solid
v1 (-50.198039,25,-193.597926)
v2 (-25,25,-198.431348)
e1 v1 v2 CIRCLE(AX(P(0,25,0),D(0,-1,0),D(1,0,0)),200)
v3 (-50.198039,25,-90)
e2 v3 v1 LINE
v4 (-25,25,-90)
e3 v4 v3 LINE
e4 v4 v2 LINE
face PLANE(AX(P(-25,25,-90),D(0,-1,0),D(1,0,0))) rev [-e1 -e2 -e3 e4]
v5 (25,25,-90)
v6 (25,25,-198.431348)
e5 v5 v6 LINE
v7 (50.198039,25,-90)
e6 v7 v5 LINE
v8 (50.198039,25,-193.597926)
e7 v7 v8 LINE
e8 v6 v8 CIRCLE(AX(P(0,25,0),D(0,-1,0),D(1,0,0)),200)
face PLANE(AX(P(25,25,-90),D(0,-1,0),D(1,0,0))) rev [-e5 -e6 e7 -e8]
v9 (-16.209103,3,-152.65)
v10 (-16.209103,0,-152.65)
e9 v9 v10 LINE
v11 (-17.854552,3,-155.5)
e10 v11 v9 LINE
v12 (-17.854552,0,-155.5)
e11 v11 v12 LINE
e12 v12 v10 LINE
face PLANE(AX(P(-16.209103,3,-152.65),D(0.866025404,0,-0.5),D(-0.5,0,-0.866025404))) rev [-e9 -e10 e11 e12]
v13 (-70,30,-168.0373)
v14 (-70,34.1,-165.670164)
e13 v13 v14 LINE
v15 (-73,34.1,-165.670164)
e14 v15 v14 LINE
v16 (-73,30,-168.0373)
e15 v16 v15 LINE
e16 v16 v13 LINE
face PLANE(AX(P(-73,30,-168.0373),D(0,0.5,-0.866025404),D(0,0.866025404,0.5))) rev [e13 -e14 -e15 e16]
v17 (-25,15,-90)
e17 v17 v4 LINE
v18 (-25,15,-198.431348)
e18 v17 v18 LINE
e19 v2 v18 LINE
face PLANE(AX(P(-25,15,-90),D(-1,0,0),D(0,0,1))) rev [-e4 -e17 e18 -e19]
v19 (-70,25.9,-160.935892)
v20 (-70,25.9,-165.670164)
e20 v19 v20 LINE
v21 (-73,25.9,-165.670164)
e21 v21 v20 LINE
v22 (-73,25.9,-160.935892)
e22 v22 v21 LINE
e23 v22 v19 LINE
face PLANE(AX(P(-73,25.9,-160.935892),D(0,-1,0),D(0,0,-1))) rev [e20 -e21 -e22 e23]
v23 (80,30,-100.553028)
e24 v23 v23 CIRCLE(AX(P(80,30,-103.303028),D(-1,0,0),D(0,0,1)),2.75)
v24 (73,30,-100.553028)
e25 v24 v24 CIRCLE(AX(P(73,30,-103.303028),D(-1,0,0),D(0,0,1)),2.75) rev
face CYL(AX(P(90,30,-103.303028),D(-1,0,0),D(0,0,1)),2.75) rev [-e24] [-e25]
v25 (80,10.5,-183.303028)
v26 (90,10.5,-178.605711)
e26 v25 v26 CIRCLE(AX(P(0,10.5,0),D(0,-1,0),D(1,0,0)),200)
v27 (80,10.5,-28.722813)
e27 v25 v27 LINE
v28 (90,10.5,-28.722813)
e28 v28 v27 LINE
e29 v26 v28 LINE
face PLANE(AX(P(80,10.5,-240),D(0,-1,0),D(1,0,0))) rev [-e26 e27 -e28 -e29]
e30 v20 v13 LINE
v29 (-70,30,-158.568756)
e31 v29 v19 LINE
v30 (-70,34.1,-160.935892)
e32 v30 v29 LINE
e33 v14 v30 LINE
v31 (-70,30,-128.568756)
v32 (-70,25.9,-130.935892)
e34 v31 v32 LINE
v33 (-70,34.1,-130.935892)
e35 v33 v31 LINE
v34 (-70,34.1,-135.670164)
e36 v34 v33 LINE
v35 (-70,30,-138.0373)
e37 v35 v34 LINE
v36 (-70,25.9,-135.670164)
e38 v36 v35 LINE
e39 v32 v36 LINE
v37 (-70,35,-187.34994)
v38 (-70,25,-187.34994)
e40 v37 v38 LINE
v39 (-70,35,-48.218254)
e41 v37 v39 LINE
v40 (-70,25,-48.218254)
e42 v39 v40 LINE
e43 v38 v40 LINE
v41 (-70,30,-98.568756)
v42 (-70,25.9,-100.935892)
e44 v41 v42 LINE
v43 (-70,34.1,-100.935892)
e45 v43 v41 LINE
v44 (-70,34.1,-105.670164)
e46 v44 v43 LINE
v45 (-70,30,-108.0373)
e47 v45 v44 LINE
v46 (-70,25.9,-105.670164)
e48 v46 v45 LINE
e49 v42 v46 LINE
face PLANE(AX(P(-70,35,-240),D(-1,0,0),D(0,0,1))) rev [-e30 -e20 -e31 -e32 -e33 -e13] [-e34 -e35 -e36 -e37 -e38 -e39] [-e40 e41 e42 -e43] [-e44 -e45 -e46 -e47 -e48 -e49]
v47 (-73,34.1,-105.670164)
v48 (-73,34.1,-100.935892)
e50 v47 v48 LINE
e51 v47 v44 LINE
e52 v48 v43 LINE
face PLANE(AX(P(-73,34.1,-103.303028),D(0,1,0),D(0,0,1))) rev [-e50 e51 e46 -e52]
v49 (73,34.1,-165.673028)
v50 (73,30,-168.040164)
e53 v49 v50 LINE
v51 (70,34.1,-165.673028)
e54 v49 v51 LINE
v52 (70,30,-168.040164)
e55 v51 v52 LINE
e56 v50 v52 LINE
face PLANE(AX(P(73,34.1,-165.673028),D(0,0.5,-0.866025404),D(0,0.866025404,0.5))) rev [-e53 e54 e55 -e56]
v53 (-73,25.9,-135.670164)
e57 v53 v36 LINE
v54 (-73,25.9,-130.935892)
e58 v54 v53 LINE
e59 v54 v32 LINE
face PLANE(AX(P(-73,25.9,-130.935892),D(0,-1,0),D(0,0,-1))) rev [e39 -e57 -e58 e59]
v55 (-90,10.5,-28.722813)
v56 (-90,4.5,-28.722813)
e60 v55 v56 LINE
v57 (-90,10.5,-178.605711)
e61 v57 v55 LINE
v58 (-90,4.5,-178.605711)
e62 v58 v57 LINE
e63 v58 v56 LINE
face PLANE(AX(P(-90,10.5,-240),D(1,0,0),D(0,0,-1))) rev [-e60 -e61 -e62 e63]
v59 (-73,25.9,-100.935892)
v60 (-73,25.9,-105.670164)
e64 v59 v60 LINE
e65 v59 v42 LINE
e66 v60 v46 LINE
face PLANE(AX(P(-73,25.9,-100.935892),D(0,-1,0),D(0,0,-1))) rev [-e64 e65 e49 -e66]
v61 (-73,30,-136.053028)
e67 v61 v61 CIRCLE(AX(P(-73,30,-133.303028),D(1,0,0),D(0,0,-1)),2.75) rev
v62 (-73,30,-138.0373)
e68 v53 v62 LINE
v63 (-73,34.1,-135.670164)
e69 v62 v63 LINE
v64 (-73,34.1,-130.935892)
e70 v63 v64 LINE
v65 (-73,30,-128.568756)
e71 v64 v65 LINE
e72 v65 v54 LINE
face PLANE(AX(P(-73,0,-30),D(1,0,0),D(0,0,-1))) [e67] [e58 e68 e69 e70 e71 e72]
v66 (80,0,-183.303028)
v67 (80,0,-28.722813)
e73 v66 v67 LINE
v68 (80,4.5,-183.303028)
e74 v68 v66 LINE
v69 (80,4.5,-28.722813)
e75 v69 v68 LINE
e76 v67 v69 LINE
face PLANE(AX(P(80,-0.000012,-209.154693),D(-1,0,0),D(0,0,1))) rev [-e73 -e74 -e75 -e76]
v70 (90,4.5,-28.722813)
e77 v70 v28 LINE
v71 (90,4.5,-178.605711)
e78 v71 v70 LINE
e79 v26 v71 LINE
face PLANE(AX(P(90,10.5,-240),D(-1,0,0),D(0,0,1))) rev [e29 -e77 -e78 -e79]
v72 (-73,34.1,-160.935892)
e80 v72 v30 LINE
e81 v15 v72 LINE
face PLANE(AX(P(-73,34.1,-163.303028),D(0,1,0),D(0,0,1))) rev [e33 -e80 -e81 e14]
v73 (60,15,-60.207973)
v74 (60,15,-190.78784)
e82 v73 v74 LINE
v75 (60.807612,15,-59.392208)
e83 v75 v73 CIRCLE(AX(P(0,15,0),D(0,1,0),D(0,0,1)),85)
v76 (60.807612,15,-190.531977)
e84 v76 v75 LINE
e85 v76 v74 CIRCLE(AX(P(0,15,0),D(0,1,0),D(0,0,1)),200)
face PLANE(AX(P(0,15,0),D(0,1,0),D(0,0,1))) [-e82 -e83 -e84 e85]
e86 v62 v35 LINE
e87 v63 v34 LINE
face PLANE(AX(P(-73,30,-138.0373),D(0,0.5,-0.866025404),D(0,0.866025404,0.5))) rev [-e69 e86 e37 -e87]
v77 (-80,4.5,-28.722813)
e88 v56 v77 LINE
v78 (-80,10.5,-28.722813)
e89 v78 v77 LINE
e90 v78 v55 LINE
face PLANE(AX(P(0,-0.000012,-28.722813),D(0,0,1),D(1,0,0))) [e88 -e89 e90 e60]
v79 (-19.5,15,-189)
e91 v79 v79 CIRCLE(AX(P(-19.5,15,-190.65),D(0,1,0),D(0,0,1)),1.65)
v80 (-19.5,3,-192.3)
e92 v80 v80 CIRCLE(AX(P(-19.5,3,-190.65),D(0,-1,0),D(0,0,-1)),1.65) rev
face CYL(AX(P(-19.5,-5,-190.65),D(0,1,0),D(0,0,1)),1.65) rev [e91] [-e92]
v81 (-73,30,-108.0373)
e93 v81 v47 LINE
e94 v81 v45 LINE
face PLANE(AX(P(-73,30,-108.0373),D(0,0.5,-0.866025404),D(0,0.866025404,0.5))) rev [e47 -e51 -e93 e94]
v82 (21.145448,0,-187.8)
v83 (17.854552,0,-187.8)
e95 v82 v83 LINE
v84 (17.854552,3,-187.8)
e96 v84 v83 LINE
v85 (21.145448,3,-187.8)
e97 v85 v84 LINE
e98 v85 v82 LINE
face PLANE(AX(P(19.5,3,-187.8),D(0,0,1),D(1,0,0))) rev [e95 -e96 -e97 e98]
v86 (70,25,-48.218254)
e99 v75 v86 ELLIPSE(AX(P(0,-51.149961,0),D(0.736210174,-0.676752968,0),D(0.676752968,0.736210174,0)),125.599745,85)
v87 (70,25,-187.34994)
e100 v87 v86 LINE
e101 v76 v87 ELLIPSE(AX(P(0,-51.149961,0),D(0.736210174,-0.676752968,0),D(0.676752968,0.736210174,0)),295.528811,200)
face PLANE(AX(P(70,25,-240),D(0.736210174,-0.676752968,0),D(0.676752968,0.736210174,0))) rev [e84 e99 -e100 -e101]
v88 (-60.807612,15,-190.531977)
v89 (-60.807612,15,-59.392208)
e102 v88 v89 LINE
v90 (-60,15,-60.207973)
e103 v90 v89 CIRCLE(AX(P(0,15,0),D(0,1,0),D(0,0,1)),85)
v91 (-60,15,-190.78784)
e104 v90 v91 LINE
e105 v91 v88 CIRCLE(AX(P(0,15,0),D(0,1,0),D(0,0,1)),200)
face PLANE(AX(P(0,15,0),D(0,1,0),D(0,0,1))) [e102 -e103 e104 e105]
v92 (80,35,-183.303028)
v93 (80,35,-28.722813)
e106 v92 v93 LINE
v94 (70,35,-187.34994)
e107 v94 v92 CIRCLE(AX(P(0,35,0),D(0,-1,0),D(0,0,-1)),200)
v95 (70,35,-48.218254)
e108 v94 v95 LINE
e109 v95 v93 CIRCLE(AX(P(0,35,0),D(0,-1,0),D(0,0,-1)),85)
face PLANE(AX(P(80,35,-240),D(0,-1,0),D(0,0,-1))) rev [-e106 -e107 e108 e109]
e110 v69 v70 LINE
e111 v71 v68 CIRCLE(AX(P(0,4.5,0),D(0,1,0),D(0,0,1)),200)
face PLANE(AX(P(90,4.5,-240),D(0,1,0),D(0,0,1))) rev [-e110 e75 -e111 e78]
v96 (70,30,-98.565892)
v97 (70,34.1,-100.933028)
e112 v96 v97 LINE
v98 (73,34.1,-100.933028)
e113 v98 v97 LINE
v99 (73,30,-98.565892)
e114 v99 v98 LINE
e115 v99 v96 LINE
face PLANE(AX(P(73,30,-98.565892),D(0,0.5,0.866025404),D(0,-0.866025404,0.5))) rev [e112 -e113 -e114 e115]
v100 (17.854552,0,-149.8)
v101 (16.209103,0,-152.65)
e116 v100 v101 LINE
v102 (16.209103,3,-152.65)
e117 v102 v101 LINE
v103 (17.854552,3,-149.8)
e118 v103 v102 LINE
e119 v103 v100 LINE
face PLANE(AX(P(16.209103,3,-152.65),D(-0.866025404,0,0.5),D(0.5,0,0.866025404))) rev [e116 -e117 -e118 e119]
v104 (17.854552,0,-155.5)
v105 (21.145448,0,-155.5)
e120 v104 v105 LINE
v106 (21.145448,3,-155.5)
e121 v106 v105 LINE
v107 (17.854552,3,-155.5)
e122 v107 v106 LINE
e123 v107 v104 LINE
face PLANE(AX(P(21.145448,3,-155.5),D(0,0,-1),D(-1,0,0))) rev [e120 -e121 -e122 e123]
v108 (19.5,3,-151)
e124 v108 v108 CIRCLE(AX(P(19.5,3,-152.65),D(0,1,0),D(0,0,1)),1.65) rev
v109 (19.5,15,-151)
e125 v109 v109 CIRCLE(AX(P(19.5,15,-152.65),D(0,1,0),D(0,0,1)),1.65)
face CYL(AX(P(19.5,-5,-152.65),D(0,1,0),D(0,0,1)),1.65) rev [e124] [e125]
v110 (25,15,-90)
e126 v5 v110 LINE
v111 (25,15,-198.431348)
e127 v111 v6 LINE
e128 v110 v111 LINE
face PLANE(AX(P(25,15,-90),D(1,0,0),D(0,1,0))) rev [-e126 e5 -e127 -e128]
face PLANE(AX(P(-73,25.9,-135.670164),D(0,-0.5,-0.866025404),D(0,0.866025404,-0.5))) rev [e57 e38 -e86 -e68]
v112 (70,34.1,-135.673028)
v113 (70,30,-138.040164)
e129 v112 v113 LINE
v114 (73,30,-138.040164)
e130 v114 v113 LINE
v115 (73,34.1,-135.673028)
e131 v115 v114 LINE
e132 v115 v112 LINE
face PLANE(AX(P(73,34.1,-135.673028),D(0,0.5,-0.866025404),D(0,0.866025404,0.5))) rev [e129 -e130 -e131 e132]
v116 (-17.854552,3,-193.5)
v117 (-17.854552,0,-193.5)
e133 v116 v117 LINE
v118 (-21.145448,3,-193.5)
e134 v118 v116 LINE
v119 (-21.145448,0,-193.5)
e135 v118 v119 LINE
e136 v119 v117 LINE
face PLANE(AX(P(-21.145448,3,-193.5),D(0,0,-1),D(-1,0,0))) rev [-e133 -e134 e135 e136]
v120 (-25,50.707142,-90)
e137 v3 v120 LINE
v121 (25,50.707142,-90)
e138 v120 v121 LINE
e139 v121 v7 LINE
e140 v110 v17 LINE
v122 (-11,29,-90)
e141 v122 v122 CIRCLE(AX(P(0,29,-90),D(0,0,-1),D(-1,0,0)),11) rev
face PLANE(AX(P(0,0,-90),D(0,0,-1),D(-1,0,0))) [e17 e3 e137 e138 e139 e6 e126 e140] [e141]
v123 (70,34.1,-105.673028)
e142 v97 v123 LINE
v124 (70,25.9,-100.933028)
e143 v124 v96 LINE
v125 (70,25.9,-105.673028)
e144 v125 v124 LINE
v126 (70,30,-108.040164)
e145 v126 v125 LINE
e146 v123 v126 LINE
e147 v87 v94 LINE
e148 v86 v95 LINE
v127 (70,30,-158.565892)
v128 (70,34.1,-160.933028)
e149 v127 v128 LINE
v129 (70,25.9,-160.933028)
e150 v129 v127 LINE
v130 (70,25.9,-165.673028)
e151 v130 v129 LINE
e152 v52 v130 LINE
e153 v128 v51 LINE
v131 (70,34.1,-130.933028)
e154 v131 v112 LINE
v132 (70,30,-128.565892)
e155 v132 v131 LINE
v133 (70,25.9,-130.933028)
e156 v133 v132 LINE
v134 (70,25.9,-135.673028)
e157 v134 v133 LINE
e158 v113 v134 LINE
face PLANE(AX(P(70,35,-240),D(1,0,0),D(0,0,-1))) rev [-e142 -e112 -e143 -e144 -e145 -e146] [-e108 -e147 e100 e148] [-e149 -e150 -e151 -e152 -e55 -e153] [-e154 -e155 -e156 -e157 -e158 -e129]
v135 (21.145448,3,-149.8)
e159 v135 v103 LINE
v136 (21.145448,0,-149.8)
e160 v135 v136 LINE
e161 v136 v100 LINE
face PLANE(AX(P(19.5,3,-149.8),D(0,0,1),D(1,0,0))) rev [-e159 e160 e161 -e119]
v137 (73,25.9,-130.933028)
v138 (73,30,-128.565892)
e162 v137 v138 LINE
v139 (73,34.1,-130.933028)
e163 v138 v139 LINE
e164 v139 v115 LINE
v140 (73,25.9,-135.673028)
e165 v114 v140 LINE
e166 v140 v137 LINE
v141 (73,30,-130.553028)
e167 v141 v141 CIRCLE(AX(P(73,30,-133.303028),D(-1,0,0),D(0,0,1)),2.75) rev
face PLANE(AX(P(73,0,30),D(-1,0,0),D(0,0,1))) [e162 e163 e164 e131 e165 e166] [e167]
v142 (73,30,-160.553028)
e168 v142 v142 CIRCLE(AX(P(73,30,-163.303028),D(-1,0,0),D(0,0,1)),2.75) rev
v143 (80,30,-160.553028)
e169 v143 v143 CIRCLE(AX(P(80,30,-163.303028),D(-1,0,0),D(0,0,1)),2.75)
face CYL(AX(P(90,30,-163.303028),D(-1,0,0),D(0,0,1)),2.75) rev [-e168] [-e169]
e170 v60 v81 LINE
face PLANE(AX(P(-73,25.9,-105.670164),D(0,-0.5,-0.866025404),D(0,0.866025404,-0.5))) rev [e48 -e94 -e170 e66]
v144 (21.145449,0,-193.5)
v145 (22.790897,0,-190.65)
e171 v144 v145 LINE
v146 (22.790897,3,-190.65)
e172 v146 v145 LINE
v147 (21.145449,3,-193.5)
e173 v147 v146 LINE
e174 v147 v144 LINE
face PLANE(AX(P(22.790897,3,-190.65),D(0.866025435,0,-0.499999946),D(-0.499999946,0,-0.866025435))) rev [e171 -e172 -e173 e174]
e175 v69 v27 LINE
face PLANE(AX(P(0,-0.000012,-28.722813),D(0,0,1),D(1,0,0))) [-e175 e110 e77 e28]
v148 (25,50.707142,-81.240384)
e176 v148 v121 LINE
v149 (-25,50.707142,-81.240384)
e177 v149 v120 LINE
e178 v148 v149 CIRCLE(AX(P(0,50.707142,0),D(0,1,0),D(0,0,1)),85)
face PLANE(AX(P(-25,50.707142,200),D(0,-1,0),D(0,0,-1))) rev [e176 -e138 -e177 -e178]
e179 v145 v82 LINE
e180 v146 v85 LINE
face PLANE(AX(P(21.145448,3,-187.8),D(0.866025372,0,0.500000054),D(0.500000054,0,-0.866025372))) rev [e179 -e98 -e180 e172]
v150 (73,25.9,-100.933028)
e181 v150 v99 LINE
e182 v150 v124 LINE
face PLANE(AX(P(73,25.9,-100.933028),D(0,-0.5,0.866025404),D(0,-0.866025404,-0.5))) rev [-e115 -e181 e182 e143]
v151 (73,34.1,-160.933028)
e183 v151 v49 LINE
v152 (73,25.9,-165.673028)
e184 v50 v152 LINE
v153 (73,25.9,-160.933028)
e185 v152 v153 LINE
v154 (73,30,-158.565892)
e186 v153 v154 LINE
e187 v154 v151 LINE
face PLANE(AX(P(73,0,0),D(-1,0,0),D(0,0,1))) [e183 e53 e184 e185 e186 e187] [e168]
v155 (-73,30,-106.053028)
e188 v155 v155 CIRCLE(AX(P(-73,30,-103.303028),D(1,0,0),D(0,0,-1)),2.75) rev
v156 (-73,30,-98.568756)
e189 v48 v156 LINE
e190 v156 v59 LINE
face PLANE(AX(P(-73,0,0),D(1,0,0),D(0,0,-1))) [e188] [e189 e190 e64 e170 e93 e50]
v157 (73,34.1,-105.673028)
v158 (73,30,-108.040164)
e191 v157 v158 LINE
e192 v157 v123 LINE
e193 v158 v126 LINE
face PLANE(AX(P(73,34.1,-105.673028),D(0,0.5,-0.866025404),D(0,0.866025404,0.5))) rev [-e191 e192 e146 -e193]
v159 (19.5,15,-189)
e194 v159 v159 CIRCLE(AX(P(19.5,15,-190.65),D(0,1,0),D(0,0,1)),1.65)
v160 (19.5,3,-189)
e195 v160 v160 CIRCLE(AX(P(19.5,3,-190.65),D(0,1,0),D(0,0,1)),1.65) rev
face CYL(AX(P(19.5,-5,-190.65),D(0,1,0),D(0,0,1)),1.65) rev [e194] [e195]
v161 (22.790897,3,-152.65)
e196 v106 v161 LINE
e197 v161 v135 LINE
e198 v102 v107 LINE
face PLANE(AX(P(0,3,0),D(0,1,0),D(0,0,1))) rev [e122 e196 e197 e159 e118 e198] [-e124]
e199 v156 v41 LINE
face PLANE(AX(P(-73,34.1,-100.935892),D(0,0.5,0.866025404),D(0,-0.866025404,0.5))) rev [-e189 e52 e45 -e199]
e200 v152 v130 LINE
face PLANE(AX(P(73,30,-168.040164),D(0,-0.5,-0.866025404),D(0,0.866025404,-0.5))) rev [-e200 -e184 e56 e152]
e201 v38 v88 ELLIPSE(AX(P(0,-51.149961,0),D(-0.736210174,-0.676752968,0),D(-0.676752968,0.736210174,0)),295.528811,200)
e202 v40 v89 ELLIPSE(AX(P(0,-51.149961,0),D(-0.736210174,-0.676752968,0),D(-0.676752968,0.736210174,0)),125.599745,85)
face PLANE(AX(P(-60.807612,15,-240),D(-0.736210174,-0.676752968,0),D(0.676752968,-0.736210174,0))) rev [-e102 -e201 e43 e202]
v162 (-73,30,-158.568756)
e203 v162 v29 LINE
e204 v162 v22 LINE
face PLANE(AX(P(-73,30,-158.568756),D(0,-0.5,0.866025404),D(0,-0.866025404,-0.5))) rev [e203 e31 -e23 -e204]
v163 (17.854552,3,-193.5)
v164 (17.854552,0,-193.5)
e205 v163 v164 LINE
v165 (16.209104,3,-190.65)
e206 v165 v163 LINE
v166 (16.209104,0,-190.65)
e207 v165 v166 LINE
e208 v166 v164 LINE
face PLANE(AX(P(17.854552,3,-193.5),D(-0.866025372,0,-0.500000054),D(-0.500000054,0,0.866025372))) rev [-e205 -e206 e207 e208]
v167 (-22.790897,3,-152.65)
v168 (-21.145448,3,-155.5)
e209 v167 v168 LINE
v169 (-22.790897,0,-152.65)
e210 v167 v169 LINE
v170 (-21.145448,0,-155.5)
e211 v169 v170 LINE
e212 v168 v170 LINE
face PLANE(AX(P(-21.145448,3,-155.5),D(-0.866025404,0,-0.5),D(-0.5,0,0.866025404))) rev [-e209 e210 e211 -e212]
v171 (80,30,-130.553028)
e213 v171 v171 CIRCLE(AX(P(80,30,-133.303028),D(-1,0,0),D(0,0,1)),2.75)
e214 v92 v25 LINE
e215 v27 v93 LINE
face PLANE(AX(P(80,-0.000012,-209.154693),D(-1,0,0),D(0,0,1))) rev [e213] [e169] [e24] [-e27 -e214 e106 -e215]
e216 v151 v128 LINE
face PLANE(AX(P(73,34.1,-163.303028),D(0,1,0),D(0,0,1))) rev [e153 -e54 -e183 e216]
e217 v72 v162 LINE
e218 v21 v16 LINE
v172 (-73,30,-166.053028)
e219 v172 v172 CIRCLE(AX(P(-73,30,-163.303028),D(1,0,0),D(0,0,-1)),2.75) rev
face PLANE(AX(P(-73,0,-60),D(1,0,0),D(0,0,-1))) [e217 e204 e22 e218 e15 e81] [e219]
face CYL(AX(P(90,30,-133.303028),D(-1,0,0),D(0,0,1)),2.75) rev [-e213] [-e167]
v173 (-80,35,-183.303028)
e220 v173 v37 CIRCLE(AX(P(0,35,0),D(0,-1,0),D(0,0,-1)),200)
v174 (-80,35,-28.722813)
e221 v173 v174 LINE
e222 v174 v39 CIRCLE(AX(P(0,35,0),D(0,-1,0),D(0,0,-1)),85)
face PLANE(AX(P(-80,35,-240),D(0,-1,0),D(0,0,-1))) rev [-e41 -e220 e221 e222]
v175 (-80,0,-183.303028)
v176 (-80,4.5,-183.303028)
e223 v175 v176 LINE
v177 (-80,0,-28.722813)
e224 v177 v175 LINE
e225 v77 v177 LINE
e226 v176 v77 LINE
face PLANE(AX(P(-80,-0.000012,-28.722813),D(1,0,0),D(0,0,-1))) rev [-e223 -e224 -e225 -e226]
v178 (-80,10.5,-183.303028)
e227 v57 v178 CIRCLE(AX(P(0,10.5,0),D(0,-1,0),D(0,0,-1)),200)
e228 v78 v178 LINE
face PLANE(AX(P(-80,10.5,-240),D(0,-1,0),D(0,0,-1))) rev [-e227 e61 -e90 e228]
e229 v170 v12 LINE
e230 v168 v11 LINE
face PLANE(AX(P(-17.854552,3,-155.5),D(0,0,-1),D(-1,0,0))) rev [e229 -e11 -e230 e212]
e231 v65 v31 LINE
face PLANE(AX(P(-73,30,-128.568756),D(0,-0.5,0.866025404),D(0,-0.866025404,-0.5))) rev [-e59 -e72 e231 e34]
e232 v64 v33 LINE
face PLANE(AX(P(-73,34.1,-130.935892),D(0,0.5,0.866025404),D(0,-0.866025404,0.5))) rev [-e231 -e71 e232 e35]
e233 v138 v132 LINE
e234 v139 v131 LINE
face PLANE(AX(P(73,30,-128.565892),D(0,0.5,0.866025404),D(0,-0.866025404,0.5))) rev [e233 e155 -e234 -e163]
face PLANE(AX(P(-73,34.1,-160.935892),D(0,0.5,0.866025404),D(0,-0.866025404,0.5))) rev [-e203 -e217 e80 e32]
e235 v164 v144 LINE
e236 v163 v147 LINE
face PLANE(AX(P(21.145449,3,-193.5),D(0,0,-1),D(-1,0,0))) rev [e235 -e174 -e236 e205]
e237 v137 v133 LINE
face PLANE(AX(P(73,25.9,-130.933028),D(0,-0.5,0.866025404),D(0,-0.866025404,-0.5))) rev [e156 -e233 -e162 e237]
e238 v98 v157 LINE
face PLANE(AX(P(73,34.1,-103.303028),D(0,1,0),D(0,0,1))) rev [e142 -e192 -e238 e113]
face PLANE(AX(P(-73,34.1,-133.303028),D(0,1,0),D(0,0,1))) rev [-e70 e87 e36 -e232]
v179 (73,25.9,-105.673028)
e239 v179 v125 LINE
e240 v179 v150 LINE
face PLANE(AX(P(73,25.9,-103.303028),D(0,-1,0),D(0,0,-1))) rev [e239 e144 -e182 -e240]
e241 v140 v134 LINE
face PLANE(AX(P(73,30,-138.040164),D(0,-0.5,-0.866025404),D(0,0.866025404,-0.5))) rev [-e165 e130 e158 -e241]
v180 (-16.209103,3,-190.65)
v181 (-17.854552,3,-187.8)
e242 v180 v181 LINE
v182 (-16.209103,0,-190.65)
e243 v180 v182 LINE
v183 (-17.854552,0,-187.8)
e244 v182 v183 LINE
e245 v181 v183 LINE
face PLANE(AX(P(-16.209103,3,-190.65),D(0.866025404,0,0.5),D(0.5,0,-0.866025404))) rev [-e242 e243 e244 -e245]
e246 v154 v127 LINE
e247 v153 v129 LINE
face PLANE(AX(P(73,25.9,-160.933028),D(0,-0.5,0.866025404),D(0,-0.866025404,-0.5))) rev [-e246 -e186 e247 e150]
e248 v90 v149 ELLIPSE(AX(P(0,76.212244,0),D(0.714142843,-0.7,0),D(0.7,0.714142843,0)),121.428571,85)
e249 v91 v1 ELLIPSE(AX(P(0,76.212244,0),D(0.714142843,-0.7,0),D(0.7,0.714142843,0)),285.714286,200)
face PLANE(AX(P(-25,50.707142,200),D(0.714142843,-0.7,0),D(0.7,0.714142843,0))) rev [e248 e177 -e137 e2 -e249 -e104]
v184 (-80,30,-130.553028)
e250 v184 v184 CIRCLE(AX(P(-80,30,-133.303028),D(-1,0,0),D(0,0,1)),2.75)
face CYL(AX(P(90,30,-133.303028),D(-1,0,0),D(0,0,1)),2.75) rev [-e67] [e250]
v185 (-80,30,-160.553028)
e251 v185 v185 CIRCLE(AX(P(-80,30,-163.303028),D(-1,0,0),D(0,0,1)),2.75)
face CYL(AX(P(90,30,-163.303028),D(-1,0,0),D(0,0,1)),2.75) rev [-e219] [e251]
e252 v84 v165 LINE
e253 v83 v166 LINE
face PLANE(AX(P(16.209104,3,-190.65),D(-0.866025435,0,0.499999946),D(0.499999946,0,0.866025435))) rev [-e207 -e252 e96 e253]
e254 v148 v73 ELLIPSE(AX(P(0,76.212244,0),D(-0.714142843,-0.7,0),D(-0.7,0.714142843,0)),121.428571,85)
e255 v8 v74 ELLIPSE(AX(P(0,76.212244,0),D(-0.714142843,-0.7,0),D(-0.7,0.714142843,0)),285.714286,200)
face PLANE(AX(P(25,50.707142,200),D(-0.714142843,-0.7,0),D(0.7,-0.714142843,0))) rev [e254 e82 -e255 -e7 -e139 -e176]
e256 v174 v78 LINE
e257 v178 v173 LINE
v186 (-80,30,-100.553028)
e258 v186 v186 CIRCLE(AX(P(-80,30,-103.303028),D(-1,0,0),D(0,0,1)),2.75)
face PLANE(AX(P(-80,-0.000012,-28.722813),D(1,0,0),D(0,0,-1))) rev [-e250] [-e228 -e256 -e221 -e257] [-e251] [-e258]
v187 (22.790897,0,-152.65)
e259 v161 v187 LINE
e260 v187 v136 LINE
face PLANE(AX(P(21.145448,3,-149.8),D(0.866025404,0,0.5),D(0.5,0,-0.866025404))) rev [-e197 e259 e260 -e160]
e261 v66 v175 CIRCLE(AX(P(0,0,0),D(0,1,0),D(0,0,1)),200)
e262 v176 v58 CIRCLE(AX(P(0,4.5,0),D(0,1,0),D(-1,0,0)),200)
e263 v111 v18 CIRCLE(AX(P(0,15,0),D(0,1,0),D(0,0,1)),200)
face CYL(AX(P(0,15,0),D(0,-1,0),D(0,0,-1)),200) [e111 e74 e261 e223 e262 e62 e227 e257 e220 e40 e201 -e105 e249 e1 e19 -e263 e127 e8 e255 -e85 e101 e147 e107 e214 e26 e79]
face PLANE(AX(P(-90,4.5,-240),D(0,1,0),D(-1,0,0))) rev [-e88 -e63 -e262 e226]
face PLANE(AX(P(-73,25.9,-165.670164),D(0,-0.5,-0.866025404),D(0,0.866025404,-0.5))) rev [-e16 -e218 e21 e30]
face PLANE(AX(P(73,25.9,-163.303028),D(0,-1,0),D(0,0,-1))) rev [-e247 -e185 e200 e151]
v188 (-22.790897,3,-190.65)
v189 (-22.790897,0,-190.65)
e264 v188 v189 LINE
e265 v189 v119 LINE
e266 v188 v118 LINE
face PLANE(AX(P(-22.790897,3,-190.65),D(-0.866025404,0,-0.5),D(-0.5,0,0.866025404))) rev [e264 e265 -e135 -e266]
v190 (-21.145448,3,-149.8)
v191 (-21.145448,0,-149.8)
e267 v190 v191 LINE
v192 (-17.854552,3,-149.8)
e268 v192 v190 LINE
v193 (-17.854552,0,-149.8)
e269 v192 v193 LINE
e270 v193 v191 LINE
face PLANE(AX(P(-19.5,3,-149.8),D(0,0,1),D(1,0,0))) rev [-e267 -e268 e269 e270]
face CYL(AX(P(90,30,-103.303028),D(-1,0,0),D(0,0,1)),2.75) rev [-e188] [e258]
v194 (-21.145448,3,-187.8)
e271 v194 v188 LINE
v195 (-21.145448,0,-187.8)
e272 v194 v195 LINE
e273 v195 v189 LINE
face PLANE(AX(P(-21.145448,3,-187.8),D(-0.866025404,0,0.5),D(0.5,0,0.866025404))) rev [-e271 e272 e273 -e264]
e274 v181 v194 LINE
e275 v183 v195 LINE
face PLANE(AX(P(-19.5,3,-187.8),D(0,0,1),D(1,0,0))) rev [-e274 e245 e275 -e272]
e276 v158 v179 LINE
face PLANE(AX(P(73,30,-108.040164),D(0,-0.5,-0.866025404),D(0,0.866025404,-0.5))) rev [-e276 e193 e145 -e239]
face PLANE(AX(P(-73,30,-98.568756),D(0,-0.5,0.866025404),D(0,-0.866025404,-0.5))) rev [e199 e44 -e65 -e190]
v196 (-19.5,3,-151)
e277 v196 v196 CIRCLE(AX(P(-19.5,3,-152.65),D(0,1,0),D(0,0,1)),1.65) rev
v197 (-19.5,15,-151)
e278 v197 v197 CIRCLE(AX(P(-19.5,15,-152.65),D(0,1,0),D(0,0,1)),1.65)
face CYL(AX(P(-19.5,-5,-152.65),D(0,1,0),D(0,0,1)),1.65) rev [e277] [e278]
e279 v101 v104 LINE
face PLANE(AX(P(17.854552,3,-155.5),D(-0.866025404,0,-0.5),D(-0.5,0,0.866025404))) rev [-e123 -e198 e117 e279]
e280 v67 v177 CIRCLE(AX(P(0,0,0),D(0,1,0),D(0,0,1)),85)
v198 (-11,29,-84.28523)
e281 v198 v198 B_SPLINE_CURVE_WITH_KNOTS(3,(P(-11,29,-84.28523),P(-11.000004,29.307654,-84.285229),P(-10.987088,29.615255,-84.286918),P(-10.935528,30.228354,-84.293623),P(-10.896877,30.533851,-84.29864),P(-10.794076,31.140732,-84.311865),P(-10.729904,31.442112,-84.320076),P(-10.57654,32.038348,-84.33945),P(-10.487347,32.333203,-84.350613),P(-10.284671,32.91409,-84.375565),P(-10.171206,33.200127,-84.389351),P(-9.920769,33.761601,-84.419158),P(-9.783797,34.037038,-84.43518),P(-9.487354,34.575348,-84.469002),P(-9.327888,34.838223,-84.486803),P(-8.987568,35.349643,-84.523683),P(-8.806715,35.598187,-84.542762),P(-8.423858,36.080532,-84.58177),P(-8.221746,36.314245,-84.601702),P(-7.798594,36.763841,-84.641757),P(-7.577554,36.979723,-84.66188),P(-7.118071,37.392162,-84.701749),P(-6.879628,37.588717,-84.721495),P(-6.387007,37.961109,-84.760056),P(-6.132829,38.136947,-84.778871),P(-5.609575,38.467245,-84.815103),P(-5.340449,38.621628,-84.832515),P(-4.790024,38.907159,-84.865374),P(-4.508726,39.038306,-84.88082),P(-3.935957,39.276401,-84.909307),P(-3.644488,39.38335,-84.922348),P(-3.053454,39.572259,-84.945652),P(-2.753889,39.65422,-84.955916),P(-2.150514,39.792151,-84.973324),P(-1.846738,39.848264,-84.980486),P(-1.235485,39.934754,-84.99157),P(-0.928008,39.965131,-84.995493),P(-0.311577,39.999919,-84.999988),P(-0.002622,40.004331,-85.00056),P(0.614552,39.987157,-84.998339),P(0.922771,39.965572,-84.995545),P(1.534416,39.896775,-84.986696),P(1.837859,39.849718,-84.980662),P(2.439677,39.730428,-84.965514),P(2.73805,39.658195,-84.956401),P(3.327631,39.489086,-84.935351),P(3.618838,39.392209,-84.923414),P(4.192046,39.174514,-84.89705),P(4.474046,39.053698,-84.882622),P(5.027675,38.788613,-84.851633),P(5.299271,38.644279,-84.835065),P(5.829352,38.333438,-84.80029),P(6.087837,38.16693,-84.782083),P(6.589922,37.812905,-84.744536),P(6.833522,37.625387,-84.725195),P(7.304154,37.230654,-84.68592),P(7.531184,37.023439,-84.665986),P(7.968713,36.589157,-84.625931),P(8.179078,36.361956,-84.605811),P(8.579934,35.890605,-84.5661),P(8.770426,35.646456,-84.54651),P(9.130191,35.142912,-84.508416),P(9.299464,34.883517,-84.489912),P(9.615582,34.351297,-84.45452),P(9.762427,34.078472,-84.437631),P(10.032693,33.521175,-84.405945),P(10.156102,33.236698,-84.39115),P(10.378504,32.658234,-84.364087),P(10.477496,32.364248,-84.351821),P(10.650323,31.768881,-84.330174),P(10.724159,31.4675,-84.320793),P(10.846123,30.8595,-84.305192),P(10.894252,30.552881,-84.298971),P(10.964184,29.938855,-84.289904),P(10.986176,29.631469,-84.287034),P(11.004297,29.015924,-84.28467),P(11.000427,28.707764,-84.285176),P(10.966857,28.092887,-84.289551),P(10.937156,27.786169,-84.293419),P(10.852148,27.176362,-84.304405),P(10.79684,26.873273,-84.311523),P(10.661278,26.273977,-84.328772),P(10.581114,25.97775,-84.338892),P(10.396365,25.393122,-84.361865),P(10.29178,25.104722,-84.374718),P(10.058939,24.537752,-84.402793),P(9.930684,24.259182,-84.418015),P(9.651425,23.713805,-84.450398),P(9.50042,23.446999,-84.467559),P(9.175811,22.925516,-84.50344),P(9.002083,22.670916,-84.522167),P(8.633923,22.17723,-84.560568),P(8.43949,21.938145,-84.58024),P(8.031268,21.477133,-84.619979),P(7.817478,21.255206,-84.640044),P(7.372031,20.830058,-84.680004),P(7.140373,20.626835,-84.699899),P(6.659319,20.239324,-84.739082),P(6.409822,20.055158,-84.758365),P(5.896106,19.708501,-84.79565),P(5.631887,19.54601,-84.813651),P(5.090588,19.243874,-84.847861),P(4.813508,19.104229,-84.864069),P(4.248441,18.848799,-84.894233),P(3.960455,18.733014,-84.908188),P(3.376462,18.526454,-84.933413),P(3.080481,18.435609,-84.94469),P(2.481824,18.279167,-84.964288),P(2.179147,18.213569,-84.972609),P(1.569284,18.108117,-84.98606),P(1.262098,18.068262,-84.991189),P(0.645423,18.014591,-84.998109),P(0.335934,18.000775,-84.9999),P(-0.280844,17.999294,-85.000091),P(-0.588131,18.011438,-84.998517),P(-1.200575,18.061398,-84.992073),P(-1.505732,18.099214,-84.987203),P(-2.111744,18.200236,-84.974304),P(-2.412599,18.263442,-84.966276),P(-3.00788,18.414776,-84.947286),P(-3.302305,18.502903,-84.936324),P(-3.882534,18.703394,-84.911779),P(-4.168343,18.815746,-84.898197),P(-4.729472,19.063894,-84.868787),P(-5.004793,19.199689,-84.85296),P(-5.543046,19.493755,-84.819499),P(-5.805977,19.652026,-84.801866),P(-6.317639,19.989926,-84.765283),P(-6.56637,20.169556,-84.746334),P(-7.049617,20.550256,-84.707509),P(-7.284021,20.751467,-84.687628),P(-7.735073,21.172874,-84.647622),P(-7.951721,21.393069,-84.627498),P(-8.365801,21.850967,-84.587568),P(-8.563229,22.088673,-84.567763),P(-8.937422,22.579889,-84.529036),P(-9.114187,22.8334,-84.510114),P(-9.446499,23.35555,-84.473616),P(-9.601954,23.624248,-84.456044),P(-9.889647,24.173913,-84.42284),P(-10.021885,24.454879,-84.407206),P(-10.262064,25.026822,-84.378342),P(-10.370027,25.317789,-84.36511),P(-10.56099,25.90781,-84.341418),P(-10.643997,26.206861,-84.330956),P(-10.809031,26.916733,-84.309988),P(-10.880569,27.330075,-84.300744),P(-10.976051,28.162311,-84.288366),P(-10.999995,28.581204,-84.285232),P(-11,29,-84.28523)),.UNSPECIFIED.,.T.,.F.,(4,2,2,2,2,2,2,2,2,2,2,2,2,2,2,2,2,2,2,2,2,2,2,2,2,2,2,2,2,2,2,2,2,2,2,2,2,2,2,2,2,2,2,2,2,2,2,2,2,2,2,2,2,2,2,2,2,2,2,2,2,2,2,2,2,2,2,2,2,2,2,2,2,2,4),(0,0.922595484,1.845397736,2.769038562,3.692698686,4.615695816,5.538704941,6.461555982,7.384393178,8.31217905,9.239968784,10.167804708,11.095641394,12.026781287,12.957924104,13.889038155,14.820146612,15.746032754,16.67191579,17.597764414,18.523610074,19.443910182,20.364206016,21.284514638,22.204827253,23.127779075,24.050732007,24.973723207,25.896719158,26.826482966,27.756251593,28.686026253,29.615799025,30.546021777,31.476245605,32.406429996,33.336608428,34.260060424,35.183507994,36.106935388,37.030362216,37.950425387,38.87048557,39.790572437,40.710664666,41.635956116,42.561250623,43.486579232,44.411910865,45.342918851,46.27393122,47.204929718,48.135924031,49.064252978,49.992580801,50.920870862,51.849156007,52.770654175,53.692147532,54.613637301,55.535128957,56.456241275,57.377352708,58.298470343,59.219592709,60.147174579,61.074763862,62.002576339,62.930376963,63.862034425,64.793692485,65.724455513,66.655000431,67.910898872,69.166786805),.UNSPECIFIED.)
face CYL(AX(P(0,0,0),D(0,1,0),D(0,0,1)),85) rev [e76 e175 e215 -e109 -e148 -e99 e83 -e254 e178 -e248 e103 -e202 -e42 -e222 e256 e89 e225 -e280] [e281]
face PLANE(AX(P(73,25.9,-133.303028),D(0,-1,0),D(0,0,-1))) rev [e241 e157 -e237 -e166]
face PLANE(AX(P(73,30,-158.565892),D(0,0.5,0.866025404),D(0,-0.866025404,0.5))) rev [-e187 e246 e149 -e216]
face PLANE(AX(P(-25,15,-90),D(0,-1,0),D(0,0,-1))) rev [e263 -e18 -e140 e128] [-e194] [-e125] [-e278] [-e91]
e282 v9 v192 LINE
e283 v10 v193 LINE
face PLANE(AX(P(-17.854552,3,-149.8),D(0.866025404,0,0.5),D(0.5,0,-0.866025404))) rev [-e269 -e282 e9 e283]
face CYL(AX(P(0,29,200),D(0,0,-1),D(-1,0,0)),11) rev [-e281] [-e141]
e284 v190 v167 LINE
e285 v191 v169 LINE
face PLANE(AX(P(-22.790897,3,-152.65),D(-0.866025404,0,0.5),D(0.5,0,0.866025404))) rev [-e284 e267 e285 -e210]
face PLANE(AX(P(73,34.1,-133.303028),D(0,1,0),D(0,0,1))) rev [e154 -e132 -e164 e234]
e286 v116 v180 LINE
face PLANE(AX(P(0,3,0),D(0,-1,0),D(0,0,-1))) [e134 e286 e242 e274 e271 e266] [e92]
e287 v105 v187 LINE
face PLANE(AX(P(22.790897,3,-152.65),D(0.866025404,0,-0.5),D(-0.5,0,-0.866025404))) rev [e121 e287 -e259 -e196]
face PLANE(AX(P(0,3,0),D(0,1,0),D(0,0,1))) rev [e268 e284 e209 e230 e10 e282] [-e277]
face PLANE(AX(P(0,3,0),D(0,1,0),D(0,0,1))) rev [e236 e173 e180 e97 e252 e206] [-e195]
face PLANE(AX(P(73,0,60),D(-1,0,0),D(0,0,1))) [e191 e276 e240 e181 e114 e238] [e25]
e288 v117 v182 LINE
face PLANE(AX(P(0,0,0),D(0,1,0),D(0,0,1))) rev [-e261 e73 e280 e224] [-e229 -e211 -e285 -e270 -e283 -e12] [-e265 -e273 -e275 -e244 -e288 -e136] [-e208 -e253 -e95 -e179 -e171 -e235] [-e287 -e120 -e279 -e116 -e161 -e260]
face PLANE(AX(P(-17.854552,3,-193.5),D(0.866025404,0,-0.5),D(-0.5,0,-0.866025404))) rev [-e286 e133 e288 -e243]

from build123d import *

# Parameters (mm, degrees)
SKETCH1_R                = 200
BOSS_EXTRUDE1_DEPTH      = 15
BOSS_EXTRUDE2_DEPTH      = 200
CUT_EXTRUDE1_DEPTH       = 286.087705803
CUT_EXTRUDE1_DEPTH_BACK  = 286.087705803
SKETCH3_R                = 85
CUT_EXTRUDE2_DEPTH       = 451.079120005
CUT_EXTRUDE2_DEPTH_BACK  = 451.079120005
SKETCH4_R                = 11
CUT_EXTRUDE3_DEPTH       = 451.079120105
CUT_EXTRUDE3_DEPTH_BACK  = 110
CUT_EXTRUDE4_DEPTH       = 110
BOSS_EXTRUDE3_DEPTH      = 200
CUT_EXTRUDE5_DEPTH       = 286.087705815
CUT_EXTRUDE5_DEPTH_BACK  = 286.087705815
SKETCH7_OUTSIDE_W        = 515.59
SKETCH7_OUTSIDE_H        = 515.59
SKETCH7_OUTSIDE_R        = 200
SKETCH9_R                = 4
BOSS_EXTRUDE4_DEPTH      = 220
CUT_EXTRUDE6_DEPTH       = 190
SKETCH11_R               = 3
CUT_EXTRUDE7_DEPTH       = 486.974499745
CUT_EXTRUDE8_DEPTH       = 302.61434707
CUT_EXTRUDE8_DEPTH_BACK  = 302.61434707
BOSS_EXTRUDE5_DEPTH      = 150
CUT_EXTRUDE9_DEPTH       = 262.287608345
CUT_EXTRUDE9_DEPTH_BACK  = 262.287608345
CUT_EXTRUDE10_DEPTH      = 259.795285906
CUT_EXTRUDE10_DEPTH_BACK = 259.795285906
SKETCH18_R               = 85
CUT_EXTRUDE11_START      = -15
CUT_EXTRUDE11_DEPTH      = 35
SKETCH20_R               = 2.75
CUT_EXTRUDE12_DEPTH      = 268.341007469
CUT_EXTRUDE13_DEPTH      = 3
CUT_EXTRUDE14_DEPTH      = 3
LPATTERN1_COUNT          = 3
LPATTERN1_PITCH          = 30
SKETCH23_R               = 1.65
CUT_EXTRUDE15_DEPTH      = 20
LPATTERN2_COUNT          = 3
LPATTERN2_PITCH          = 30
CUT_EXTRUDE16_DEPTH      = 3


# Read off the part's stored shape, not the designer's step: Cut-Extrude11
with BuildPart() as part:
    # Sketch1 → Boss-Extrude1 (new body)
    with BuildSketch(Plane(origin=(0, 0, 0), x_dir=(1, 0, 0), z_dir=(0, 1, 0))):
        with Locations(Location((0, 0, 0), (0, 0, 270))):
            Circle(SKETCH1_R)
    extrude(amount=BOSS_EXTRUDE1_DEPTH)

    # Sketch2 → Boss-Extrude2 (add, symmetric)
    with BuildSketch(Plane.XY):
        Polygon((-25, 50.707142143), (25, 50.707142143), (60, 15), (-60, 15), align=None)
    extrude(amount=BOSS_EXTRUDE2_DEPTH, both=True)

    # Sketch3 → Cut-Extrude1 (cut, two sides: drawn at the far end of the back side and taken through both)
    with BuildSketch(Plane(origin=(0, 15, 0), x_dir=(1, 0, 0), z_dir=(0, 1, 0)).offset(-CUT_EXTRUDE1_DEPTH_BACK)):
        with Locations(Location((0, 0, 0), (0, 0, 270))):
            Circle(SKETCH3_R)
    extrude(amount=CUT_EXTRUDE1_DEPTH + CUT_EXTRUDE1_DEPTH_BACK, mode=Mode.SUBTRACT)

    # Sketch4 → Cut-Extrude2 (cut, two sides: drawn at the far end of the back side and taken through both)
    with BuildSketch(Plane(origin=(0, 0, -200), x_dir=(-1, 0, 0), z_dir=(0, 0, -1)).offset(-CUT_EXTRUDE2_DEPTH_BACK)):
        with Locations((0, 29)):
            Circle(SKETCH4_R)
    extrude(amount=CUT_EXTRUDE2_DEPTH + CUT_EXTRUDE2_DEPTH_BACK, mode=Mode.SUBTRACT)

    # Sketch5 → Cut-Extrude3 (cut, two sides: drawn at the far end of the back side and taken through both)
    with BuildSketch(Plane.XY.offset(200).offset(-CUT_EXTRUDE3_DEPTH_BACK)):
        Polygon((-25, 50.707142143), (25, 50.707142143), (50.198039412, 25), (25, 25), (25, 15), (-25, 15), (-25, 25), (-50.198039412, 25), align=None)
    extrude(amount=CUT_EXTRUDE3_DEPTH + CUT_EXTRUDE3_DEPTH_BACK, mode=Mode.SUBTRACT)

    # Sketch6 → Cut-Extrude4 (cut)
    with BuildSketch(Plane(origin=(0, 0, -200), x_dir=(-1, 0, 0), z_dir=(0, 0, -1))):
        Polygon((-25, 50.707142143), (25, 50.707142143), (50.198039412, 25), (25, 25), (25, 15), (-25, 15), (-25, 25), (-50.198039412, 25), align=None)
    extrude(amount=-CUT_EXTRUDE4_DEPTH, mode=Mode.SUBTRACT)

    # Sketch8 → Boss-Extrude3 (add, symmetric)
    with BuildSketch(Plane(origin=(0, 0, 0), x_dir=(0, 0, -1), z_dir=(1, 0, 0))):
        Polygon((0, 15), (-20, 15), (-10, 35.712315177), (10, 35.712315177), (20, 15), align=None)
    extrude(amount=BOSS_EXTRUDE3_DEPTH, both=True)

    # Sketch7 outside → Cut-Extrude5 (cut, two sides: drawn at the far end of the back side and taken through both)
    with BuildSketch(Plane(origin=(0, 15, 0), x_dir=(1, 0, 0), z_dir=(0, 1, 0)).offset(-CUT_EXTRUDE5_DEPTH_BACK)):
        Rectangle(SKETCH7_OUTSIDE_W, SKETCH7_OUTSIDE_H)
        with Locations(Location((0, 0, 0), (0, 0, 97.180755781))):
            Circle(SKETCH7_OUTSIDE_R, mode=Mode.SUBTRACT)
    extrude(amount=CUT_EXTRUDE5_DEPTH + CUT_EXTRUDE5_DEPTH_BACK, mode=Mode.SUBTRACT)

    # Sketch9 → Boss-Extrude4 (add, symmetric)
    with BuildSketch(Plane(origin=(0, 0, 0), x_dir=(0, 0, -1), z_dir=(1, 0, 0))):
        with Locations(Location((0, 29, 0), (0, 0, 180))):
            Circle(SKETCH9_R)
    extrude(amount=BOSS_EXTRUDE4_DEPTH, both=True)

    # Sketch10 → Cut-Extrude6 (cut, symmetric)
    with BuildSketch(Plane(origin=(0, 0, 0), x_dir=(0, 0, -1), z_dir=(1, 0, 0))):
        Polygon((-20, 15), (20, 15), (10, 35.712315177), (-10, 35.712315177), align=None)
    extrude(amount=CUT_EXTRUDE6_DEPTH, both=True, mode=Mode.SUBTRACT)

    # Sketch11 → Cut-Extrude7 (cut, through all)
    with BuildSketch(Plane.ZY.offset(220)):
        with Locations((0, 29)):
            Circle(SKETCH11_R)
    extrude(amount=-CUT_EXTRUDE7_DEPTH, mode=Mode.SUBTRACT)

    # Sketch14 → Cut-Extrude8 (cut, two sides: drawn at the far end of the back side and taken through both)
    with BuildSketch(Plane(origin=(0, 0, 0), x_dir=(1, 0, 0), z_dir=(0, 1, 0)).offset(-CUT_EXTRUDE8_DEPTH_BACK)):
        Polygon((-80, 28.722813233), (-80, 204.683452683), (-270.013244013, 28.722813233), (-103.583737584, -216.10995611), (187.046893047, -216.10995611), (266.535612536, 150.034958035), (80, 209.154693155), (80, 28.722813233), align=None)
    extrude(amount=CUT_EXTRUDE8_DEPTH + CUT_EXTRUDE8_DEPTH_BACK, mode=Mode.SUBTRACT)

    # Sketch16 → Boss-Extrude5 (add, symmetric)
    with BuildSketch(Plane(origin=(0, 0, -90), x_dir=(-1, 0, 0), z_dir=(0, 0, -1))):
        Polygon((-80, 15), (-80, 35), (-70, 35), (-70, 25), (-60.807611845, 15), (-60.807611845, 0), (-80, 0), (-80, 4.5), (-90, 4.5), (-90, 10.5), (-80, 10.5), align=None)
        Polygon((80, 15), (80, 35), (70, 35), (70, 25), (60.807611845, 15), (60.807611845, 0), (80, 0), (80, 4.5), (90, 4.5), (90, 10.5), (80, 10.5), align=None)
    extrude(amount=BOSS_EXTRUDE5_DEPTH, both=True)

    # Sketch17 → Cut-Extrude9 (cut, two sides: drawn at the far end of the back side and taken through both)
    with BuildSketch(Plane(origin=(0, 0, 0), x_dir=(1, 0, 0), z_dir=(0, 1, 0)).offset(-CUT_EXTRUDE9_DEPTH_BACK)):
        Polygon((-80, 28.722813233), (-99.608008808, 28.722813233), (-99.608008808, -74.271563426), (112.245925984, -74.271563426), (112.245925984, 0), (109.222119936, 28.722813233), (80, 28.722813233), align=None)
    extrude(amount=CUT_EXTRUDE9_DEPTH + CUT_EXTRUDE9_DEPTH_BACK, mode=Mode.SUBTRACT)

    # Sketch18 → Cut-Extrude10 (cut, two sides: drawn at the far end of the back side and taken through both)
    with BuildSketch(Plane(origin=(0, 15, 0), x_dir=(1, 0, 0), z_dir=(0, 1, 0)).offset(-CUT_EXTRUDE10_DEPTH_BACK)):
        Circle(SKETCH18_R)
    extrude(amount=CUT_EXTRUDE10_DEPTH + CUT_EXTRUDE10_DEPTH_BACK, mode=Mode.SUBTRACT)

    # Cut-Extrude11 outline → Cut-Extrude11 (cut)
    with BuildSketch(Plane(origin=(0, 15, 0), x_dir=(1, 0, 0), z_dir=(0, 1, 0)).offset(CUT_EXTRUDE11_START)):
        with BuildLine():
            Line((60.807611845, 240), (60.807611845, 190.531977216))
            ThreePointArc((60.807611845, 190.531977216), (75.639228606, 185.145097413), (90, 178.605710995))
            Line((90, 178.605710995), (90, 240))
            Line((90, 240), (60.807611845, 240))
        make_face()
        with BuildLine():
            Line((-60.807611845, 190.531977216), (-60.807611845, 240))
            Line((-60.807611845, 240), (-90, 240))
            Line((-90, 240), (-90, 178.605710995))
            ThreePointArc((-90, 178.605710995), (-75.639228606, 185.145097413), (-60.807611845, 190.531977216))
        make_face()
    extrude(amount=CUT_EXTRUDE11_DEPTH, mode=Mode.SUBTRACT)

    # Sketch20 → Cut-Extrude12 (cut, through all)
    with BuildSketch(Plane.ZY.offset(80)):
        with Locations((-163.303027798, 30)):
            Circle(SKETCH20_R)
        with Locations((-103.303027798, 30)):
            Circle(SKETCH20_R)
        with Locations((-133.303027798, 30)):
            Circle(SKETCH20_R)
    extrude(amount=-CUT_EXTRUDE12_DEPTH, mode=Mode.SUBTRACT)

    # Sketch21 → Cut-Extrude13 (cut)
    with BuildSketch(Plane(origin=(-70, 0, 0), x_dir=(0, 0, -1), z_dir=(1, 0, 0))):
        Polygon((100.935891695, 34.1), (98.568755591, 30), (100.935891695, 25.9), (105.670163902, 25.9), (108.037300006, 30), (105.670163902, 34.1), (103.303027798, 34.1), align=None)
    cut_extrude13 = extrude(amount=-CUT_EXTRUDE13_DEPTH, mode=Mode.SUBTRACT)

    # Sketch22 → Cut-Extrude14 (cut)
    with BuildSketch(Plane.ZY.offset(-70)):
        Polygon((-163.303027798, 34.1), (-160.933027798, 34.1), (-158.565891695, 30), (-160.933027798, 25.9), (-163.303027798, 25.9), (-165.673027798, 25.9), (-168.040163902, 30), (-165.673027798, 34.1), align=None)
    cut_extrude14 = extrude(amount=-CUT_EXTRUDE14_DEPTH, mode=Mode.SUBTRACT)

    # LPattern1: Cut-Extrude14 ×3
    with Locations(*[(0, 0, i * LPATTERN1_PITCH) for i in range(1, LPATTERN1_COUNT)]):
        add(cut_extrude14, mode=Mode.SUBTRACT)

    # Sketch23 → Cut-Extrude15 (cut)
    with BuildSketch(Plane(origin=(0, 15, 0), x_dir=(1, 0, 0), z_dir=(0, 1, 0))):
        with Locations(Location((19.5, 152.65, 0), (0, 0, 270))):
            Circle(SKETCH23_R)
        with Locations(Location((-19.5, 152.65, 0), (0, 0, 270))):
            Circle(SKETCH23_R)
        with Locations(Location((-19.5, 190.65, 0), (0, 0, 270))):
            Circle(SKETCH23_R)
        with Locations(Location((19.5, 190.65, 0), (0, 0, 270))):
            Circle(SKETCH23_R)
    extrude(amount=-CUT_EXTRUDE15_DEPTH, mode=Mode.SUBTRACT)

    # LPattern2: Cut-Extrude13 ×3
    with Locations(*[(0, 0, -i * LPATTERN2_PITCH) for i in range(1, LPATTERN2_COUNT)]):
        add(cut_extrude13, mode=Mode.SUBTRACT)

    # Sketch24 → Cut-Extrude16 (cut)
    with BuildSketch(Plane.XZ):
        Polygon((-19.5, -187.8), (-17.854551733, -187.8), (-16.209103466, -190.65), (-17.854551733, -193.5), (-21.145448267, -193.5), (-22.790896534, -190.65), (-21.145448267, -187.8), align=None)
        Polygon((-19.5, -149.8), (-17.854551733, -149.8), (-16.209103466, -152.65), (-17.854551733, -155.5), (-21.145448267, -155.5), (-22.790896534, -152.65), (-21.145448267, -149.8), align=None)
        Polygon((19.5, -149.8), (21.145448267, -149.8), (22.790896534, -152.65), (21.145448267, -155.5), (17.854551733, -155.5), (16.209103466, -152.65), (17.854551733, -149.8), align=None)
        Polygon((19.5, -187.8), (21.145448267, -187.8), (22.790896713, -190.649999897), (21.145448624, -193.5), (17.85455209, -193.5), (16.209103644, -190.650000103), (17.854551733, -187.8), align=None)
    extrude(amount=-CUT_EXTRUDE16_DEPTH, mode=Mode.SUBTRACT)


solid = part.part
